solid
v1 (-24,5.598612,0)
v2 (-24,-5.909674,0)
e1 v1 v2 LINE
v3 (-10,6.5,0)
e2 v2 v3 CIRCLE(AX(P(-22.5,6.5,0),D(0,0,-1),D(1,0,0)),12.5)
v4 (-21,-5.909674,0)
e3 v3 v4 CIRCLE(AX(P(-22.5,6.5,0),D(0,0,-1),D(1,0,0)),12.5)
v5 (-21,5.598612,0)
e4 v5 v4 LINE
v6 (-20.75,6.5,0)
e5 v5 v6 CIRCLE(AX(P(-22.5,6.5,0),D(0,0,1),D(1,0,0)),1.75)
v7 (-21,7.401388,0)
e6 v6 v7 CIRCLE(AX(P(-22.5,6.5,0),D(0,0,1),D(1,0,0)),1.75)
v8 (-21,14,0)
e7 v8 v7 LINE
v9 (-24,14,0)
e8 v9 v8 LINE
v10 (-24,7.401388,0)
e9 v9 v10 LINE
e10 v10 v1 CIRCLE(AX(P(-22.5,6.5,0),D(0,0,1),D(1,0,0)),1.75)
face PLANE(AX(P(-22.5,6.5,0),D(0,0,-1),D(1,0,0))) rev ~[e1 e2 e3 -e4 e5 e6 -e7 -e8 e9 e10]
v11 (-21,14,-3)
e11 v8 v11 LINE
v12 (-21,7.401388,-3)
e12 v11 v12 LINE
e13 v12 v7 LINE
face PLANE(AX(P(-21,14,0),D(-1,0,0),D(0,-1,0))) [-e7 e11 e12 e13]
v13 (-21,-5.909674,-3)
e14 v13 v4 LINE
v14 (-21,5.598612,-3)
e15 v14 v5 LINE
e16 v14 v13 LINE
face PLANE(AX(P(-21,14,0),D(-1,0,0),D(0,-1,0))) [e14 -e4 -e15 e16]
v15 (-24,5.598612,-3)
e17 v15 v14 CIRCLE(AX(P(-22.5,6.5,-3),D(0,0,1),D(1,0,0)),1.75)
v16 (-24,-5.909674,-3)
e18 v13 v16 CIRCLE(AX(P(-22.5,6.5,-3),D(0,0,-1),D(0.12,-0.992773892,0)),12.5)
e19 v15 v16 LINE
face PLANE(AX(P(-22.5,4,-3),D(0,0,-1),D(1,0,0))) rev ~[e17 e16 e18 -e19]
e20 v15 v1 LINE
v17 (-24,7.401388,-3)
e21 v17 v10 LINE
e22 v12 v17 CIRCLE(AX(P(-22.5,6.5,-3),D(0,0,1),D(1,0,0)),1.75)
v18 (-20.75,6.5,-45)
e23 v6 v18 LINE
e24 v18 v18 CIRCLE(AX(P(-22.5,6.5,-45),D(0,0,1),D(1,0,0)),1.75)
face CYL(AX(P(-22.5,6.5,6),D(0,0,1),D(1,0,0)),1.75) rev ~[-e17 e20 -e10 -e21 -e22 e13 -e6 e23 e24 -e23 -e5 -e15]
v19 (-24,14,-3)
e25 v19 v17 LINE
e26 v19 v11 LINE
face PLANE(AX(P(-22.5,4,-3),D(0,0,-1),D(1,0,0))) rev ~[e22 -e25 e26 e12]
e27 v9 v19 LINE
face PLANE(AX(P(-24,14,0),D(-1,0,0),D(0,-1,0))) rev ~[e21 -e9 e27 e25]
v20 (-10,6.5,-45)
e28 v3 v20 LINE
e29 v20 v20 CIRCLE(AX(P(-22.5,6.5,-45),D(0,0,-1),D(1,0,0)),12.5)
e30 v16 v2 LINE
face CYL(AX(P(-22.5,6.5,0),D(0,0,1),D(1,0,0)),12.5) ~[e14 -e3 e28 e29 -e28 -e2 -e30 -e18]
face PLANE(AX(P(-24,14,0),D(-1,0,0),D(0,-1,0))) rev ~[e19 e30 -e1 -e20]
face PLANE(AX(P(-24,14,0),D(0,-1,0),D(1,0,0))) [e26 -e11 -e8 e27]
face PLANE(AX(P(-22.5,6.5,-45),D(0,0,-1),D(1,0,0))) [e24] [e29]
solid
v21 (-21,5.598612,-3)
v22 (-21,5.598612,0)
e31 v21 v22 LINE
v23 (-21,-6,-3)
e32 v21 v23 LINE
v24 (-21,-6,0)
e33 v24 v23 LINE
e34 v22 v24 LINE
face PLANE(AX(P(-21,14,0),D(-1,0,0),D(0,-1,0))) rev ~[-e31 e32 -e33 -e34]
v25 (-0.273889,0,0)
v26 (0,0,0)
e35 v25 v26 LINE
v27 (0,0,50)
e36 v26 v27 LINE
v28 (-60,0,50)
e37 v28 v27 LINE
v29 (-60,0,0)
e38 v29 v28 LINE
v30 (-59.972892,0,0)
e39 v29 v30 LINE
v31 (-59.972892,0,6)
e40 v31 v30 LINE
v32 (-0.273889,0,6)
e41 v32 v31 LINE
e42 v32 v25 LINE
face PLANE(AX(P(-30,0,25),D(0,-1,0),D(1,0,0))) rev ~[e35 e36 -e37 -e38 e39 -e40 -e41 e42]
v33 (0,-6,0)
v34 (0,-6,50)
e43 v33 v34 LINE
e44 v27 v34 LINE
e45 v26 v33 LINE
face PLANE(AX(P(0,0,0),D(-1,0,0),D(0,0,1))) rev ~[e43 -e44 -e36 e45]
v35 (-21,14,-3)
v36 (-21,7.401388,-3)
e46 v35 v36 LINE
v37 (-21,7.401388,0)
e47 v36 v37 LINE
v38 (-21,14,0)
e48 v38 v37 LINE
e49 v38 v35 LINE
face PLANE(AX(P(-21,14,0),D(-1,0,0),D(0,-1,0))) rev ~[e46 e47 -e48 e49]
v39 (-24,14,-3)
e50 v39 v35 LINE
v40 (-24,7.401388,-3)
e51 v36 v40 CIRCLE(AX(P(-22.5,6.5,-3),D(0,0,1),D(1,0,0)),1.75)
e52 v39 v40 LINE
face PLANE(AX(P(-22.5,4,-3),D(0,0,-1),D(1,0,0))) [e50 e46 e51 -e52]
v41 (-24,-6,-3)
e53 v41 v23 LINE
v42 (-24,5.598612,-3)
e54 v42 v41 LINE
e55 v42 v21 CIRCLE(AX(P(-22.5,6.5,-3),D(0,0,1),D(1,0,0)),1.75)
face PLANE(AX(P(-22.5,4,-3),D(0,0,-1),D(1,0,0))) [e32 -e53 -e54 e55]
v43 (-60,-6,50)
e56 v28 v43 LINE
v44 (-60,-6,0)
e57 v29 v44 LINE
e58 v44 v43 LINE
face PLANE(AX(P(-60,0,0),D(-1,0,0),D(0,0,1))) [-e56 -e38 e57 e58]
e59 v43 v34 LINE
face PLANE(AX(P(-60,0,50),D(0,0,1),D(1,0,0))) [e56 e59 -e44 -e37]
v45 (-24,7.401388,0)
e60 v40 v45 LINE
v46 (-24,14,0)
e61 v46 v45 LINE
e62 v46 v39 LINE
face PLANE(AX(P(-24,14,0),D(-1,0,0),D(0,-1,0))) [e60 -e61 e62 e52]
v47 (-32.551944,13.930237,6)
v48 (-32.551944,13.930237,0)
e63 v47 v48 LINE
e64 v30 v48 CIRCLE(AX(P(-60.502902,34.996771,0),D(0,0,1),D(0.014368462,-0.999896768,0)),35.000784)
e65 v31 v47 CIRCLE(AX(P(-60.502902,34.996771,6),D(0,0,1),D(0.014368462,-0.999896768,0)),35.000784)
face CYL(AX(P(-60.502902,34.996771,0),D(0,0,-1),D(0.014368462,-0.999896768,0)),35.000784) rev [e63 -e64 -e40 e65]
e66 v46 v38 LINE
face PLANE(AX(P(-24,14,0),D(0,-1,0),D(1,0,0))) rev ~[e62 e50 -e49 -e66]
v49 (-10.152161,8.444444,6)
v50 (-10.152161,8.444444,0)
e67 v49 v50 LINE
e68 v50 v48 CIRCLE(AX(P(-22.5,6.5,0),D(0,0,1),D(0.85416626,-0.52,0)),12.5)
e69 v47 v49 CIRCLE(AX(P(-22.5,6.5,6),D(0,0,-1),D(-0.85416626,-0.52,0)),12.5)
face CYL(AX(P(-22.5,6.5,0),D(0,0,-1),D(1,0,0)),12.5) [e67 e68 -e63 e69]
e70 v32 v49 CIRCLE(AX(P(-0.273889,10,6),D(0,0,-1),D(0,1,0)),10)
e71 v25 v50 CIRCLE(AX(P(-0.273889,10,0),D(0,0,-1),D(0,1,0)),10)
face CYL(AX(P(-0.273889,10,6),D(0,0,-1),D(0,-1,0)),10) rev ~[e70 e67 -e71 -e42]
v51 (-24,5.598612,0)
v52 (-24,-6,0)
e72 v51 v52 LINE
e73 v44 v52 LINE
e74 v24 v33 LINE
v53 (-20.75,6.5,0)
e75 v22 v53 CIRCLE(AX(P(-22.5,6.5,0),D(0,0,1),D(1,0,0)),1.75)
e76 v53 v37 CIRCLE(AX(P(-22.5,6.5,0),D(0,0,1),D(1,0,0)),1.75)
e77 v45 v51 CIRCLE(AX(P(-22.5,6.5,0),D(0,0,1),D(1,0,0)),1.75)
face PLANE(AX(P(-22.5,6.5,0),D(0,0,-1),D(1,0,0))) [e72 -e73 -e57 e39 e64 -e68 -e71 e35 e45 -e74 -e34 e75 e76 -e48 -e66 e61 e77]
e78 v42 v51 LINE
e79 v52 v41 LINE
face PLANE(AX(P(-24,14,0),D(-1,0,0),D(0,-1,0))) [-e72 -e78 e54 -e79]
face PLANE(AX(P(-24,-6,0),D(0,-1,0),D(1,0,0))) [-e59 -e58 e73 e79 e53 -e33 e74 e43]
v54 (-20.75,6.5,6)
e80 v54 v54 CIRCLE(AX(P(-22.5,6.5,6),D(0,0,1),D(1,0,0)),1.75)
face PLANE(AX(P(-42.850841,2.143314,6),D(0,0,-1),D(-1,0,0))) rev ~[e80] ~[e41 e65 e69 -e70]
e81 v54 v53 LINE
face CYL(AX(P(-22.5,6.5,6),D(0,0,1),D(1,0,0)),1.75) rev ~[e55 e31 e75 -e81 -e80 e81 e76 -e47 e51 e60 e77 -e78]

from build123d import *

# Parameters (mm, degrees)
F0_W         = 60
F0_H         = 50
F1_DEPTH     = 6
F2_R         = 12.5
F3_DEPTH     = 6
F4_W         = 3
F4_H         = 20
F5_DEPTH     = 3
F6_R         = 12.5
F7_DEPTH     = 45
F8_R         = 1.75
F9_DEPTH     = 51.001
F10_T1_DEPTH = 6
F11_R        = 10
F12_DEPTH    = 3


# Not quite as in the source:
# - a fillet or chamfer that OpenCascade refuses, or shapes differently, is made with other operations: its cross-section is extruded or revolved along the edge and cut away or added


with BuildPart() as f1:
    # F0 (on Front) → F1 (new body)
    with BuildSketch(Plane.XZ):
        with Locations((-30, 25)):
            Rectangle(F0_W, F0_H)
    extrude(amount=F1_DEPTH)

    # F2 (on face) → F3 (join)
    with BuildSketch(Plane(origin=(0, 0, 0), x_dir=(1, 0, 0), z_dir=(0, 0, -1))):
        with Locations((-22.5, -6.5)):
            Circle(F2_R)
    extrude(amount=-F3_DEPTH)

    # F4 (on face) → F5 (join)
    with BuildSketch(Plane(origin=(0, 0, 0), x_dir=(1, 0, 0), z_dir=(0, 0, -1))):
        with Locations((-22.5, -4)):
            Rectangle(F4_W, F4_H)
    extrude(amount=F5_DEPTH)


with BuildPart() as f7:
    # F6 (on face) → F7 (new body)
    with BuildSketch(Plane(origin=(0, 0, 0), x_dir=(1, 0, 0), z_dir=(0, 0, -1))):
        with Locations((-22.5, -6.5)):
            Circle(F6_R)
    extrude(amount=F7_DEPTH)


with BuildPart() as f9_tool:
    # F8 (on face) → F9 (new body, through all)
    with BuildSketch(Plane.XY.offset(6)):
        with Locations((-22.5, 6.5)):
            Circle(F8_R)
    extrude(amount=-F9_DEPTH)


with BuildPart() as f1_1:
    add(f1.part)

    # F9: cut by f9_tool
    add(f9_tool.part, mode=Mode.SUBTRACT)

    # F10: fillet of radius 35 on 2 edges, made by hand

    # F10_s2 → F10_t1 (join)
    with BuildSketch(Plane.XY):
        with BuildLine():
            ThreePointArc((-59.9999942526, -0.0003999587), (-44.6241465011, 3.8051050521), (-32.5003627011, 13.9988496455))
            Line((-32.5003627011, 13.9988496455), (-29.7001088019, 11.8990575092))
            ThreePointArc((-29.7001088019, 11.8990575092), (-31.4894392952, 6.9342461078), (-30.1874293614, 1.8200407762))
            Line((-30.1874293614, 1.8200407762), (-33.177078252, -3.5000784157))
            Line((-33.177078252, -3.5000784157), (-59.9497035085, -3.5001170554))
            Line((-59.9497035085, -3.5001170554), (-59.9999942526, -0.0003999587))
        make_face()
    extrude(amount=F10_T1_DEPTH)

    # F11
    f11_edges = [f1_1.edges().sort_by_distance(p)[0] for p in [
        (-11.822922, 0, 3),
    ]]
    fillet(f11_edges, radius=F11_R)


with BuildPart() as f7_1:
    add(f7.part)

    # F9: cut by f9_tool
    add(f9_tool.part, mode=Mode.SUBTRACT)

    # F4 (on face) → F12 (cut)
    with BuildSketch(Plane(origin=(0, 0, 0), x_dir=(1, 0, 0), z_dir=(0, 0, -1))):
        with Locations((-22.5, -4)):
            Rectangle(F4_W, F4_H)
    extrude(amount=F12_DEPTH, mode=Mode.SUBTRACT)


solid = Compound([f1_1.part, f7_1.part])
